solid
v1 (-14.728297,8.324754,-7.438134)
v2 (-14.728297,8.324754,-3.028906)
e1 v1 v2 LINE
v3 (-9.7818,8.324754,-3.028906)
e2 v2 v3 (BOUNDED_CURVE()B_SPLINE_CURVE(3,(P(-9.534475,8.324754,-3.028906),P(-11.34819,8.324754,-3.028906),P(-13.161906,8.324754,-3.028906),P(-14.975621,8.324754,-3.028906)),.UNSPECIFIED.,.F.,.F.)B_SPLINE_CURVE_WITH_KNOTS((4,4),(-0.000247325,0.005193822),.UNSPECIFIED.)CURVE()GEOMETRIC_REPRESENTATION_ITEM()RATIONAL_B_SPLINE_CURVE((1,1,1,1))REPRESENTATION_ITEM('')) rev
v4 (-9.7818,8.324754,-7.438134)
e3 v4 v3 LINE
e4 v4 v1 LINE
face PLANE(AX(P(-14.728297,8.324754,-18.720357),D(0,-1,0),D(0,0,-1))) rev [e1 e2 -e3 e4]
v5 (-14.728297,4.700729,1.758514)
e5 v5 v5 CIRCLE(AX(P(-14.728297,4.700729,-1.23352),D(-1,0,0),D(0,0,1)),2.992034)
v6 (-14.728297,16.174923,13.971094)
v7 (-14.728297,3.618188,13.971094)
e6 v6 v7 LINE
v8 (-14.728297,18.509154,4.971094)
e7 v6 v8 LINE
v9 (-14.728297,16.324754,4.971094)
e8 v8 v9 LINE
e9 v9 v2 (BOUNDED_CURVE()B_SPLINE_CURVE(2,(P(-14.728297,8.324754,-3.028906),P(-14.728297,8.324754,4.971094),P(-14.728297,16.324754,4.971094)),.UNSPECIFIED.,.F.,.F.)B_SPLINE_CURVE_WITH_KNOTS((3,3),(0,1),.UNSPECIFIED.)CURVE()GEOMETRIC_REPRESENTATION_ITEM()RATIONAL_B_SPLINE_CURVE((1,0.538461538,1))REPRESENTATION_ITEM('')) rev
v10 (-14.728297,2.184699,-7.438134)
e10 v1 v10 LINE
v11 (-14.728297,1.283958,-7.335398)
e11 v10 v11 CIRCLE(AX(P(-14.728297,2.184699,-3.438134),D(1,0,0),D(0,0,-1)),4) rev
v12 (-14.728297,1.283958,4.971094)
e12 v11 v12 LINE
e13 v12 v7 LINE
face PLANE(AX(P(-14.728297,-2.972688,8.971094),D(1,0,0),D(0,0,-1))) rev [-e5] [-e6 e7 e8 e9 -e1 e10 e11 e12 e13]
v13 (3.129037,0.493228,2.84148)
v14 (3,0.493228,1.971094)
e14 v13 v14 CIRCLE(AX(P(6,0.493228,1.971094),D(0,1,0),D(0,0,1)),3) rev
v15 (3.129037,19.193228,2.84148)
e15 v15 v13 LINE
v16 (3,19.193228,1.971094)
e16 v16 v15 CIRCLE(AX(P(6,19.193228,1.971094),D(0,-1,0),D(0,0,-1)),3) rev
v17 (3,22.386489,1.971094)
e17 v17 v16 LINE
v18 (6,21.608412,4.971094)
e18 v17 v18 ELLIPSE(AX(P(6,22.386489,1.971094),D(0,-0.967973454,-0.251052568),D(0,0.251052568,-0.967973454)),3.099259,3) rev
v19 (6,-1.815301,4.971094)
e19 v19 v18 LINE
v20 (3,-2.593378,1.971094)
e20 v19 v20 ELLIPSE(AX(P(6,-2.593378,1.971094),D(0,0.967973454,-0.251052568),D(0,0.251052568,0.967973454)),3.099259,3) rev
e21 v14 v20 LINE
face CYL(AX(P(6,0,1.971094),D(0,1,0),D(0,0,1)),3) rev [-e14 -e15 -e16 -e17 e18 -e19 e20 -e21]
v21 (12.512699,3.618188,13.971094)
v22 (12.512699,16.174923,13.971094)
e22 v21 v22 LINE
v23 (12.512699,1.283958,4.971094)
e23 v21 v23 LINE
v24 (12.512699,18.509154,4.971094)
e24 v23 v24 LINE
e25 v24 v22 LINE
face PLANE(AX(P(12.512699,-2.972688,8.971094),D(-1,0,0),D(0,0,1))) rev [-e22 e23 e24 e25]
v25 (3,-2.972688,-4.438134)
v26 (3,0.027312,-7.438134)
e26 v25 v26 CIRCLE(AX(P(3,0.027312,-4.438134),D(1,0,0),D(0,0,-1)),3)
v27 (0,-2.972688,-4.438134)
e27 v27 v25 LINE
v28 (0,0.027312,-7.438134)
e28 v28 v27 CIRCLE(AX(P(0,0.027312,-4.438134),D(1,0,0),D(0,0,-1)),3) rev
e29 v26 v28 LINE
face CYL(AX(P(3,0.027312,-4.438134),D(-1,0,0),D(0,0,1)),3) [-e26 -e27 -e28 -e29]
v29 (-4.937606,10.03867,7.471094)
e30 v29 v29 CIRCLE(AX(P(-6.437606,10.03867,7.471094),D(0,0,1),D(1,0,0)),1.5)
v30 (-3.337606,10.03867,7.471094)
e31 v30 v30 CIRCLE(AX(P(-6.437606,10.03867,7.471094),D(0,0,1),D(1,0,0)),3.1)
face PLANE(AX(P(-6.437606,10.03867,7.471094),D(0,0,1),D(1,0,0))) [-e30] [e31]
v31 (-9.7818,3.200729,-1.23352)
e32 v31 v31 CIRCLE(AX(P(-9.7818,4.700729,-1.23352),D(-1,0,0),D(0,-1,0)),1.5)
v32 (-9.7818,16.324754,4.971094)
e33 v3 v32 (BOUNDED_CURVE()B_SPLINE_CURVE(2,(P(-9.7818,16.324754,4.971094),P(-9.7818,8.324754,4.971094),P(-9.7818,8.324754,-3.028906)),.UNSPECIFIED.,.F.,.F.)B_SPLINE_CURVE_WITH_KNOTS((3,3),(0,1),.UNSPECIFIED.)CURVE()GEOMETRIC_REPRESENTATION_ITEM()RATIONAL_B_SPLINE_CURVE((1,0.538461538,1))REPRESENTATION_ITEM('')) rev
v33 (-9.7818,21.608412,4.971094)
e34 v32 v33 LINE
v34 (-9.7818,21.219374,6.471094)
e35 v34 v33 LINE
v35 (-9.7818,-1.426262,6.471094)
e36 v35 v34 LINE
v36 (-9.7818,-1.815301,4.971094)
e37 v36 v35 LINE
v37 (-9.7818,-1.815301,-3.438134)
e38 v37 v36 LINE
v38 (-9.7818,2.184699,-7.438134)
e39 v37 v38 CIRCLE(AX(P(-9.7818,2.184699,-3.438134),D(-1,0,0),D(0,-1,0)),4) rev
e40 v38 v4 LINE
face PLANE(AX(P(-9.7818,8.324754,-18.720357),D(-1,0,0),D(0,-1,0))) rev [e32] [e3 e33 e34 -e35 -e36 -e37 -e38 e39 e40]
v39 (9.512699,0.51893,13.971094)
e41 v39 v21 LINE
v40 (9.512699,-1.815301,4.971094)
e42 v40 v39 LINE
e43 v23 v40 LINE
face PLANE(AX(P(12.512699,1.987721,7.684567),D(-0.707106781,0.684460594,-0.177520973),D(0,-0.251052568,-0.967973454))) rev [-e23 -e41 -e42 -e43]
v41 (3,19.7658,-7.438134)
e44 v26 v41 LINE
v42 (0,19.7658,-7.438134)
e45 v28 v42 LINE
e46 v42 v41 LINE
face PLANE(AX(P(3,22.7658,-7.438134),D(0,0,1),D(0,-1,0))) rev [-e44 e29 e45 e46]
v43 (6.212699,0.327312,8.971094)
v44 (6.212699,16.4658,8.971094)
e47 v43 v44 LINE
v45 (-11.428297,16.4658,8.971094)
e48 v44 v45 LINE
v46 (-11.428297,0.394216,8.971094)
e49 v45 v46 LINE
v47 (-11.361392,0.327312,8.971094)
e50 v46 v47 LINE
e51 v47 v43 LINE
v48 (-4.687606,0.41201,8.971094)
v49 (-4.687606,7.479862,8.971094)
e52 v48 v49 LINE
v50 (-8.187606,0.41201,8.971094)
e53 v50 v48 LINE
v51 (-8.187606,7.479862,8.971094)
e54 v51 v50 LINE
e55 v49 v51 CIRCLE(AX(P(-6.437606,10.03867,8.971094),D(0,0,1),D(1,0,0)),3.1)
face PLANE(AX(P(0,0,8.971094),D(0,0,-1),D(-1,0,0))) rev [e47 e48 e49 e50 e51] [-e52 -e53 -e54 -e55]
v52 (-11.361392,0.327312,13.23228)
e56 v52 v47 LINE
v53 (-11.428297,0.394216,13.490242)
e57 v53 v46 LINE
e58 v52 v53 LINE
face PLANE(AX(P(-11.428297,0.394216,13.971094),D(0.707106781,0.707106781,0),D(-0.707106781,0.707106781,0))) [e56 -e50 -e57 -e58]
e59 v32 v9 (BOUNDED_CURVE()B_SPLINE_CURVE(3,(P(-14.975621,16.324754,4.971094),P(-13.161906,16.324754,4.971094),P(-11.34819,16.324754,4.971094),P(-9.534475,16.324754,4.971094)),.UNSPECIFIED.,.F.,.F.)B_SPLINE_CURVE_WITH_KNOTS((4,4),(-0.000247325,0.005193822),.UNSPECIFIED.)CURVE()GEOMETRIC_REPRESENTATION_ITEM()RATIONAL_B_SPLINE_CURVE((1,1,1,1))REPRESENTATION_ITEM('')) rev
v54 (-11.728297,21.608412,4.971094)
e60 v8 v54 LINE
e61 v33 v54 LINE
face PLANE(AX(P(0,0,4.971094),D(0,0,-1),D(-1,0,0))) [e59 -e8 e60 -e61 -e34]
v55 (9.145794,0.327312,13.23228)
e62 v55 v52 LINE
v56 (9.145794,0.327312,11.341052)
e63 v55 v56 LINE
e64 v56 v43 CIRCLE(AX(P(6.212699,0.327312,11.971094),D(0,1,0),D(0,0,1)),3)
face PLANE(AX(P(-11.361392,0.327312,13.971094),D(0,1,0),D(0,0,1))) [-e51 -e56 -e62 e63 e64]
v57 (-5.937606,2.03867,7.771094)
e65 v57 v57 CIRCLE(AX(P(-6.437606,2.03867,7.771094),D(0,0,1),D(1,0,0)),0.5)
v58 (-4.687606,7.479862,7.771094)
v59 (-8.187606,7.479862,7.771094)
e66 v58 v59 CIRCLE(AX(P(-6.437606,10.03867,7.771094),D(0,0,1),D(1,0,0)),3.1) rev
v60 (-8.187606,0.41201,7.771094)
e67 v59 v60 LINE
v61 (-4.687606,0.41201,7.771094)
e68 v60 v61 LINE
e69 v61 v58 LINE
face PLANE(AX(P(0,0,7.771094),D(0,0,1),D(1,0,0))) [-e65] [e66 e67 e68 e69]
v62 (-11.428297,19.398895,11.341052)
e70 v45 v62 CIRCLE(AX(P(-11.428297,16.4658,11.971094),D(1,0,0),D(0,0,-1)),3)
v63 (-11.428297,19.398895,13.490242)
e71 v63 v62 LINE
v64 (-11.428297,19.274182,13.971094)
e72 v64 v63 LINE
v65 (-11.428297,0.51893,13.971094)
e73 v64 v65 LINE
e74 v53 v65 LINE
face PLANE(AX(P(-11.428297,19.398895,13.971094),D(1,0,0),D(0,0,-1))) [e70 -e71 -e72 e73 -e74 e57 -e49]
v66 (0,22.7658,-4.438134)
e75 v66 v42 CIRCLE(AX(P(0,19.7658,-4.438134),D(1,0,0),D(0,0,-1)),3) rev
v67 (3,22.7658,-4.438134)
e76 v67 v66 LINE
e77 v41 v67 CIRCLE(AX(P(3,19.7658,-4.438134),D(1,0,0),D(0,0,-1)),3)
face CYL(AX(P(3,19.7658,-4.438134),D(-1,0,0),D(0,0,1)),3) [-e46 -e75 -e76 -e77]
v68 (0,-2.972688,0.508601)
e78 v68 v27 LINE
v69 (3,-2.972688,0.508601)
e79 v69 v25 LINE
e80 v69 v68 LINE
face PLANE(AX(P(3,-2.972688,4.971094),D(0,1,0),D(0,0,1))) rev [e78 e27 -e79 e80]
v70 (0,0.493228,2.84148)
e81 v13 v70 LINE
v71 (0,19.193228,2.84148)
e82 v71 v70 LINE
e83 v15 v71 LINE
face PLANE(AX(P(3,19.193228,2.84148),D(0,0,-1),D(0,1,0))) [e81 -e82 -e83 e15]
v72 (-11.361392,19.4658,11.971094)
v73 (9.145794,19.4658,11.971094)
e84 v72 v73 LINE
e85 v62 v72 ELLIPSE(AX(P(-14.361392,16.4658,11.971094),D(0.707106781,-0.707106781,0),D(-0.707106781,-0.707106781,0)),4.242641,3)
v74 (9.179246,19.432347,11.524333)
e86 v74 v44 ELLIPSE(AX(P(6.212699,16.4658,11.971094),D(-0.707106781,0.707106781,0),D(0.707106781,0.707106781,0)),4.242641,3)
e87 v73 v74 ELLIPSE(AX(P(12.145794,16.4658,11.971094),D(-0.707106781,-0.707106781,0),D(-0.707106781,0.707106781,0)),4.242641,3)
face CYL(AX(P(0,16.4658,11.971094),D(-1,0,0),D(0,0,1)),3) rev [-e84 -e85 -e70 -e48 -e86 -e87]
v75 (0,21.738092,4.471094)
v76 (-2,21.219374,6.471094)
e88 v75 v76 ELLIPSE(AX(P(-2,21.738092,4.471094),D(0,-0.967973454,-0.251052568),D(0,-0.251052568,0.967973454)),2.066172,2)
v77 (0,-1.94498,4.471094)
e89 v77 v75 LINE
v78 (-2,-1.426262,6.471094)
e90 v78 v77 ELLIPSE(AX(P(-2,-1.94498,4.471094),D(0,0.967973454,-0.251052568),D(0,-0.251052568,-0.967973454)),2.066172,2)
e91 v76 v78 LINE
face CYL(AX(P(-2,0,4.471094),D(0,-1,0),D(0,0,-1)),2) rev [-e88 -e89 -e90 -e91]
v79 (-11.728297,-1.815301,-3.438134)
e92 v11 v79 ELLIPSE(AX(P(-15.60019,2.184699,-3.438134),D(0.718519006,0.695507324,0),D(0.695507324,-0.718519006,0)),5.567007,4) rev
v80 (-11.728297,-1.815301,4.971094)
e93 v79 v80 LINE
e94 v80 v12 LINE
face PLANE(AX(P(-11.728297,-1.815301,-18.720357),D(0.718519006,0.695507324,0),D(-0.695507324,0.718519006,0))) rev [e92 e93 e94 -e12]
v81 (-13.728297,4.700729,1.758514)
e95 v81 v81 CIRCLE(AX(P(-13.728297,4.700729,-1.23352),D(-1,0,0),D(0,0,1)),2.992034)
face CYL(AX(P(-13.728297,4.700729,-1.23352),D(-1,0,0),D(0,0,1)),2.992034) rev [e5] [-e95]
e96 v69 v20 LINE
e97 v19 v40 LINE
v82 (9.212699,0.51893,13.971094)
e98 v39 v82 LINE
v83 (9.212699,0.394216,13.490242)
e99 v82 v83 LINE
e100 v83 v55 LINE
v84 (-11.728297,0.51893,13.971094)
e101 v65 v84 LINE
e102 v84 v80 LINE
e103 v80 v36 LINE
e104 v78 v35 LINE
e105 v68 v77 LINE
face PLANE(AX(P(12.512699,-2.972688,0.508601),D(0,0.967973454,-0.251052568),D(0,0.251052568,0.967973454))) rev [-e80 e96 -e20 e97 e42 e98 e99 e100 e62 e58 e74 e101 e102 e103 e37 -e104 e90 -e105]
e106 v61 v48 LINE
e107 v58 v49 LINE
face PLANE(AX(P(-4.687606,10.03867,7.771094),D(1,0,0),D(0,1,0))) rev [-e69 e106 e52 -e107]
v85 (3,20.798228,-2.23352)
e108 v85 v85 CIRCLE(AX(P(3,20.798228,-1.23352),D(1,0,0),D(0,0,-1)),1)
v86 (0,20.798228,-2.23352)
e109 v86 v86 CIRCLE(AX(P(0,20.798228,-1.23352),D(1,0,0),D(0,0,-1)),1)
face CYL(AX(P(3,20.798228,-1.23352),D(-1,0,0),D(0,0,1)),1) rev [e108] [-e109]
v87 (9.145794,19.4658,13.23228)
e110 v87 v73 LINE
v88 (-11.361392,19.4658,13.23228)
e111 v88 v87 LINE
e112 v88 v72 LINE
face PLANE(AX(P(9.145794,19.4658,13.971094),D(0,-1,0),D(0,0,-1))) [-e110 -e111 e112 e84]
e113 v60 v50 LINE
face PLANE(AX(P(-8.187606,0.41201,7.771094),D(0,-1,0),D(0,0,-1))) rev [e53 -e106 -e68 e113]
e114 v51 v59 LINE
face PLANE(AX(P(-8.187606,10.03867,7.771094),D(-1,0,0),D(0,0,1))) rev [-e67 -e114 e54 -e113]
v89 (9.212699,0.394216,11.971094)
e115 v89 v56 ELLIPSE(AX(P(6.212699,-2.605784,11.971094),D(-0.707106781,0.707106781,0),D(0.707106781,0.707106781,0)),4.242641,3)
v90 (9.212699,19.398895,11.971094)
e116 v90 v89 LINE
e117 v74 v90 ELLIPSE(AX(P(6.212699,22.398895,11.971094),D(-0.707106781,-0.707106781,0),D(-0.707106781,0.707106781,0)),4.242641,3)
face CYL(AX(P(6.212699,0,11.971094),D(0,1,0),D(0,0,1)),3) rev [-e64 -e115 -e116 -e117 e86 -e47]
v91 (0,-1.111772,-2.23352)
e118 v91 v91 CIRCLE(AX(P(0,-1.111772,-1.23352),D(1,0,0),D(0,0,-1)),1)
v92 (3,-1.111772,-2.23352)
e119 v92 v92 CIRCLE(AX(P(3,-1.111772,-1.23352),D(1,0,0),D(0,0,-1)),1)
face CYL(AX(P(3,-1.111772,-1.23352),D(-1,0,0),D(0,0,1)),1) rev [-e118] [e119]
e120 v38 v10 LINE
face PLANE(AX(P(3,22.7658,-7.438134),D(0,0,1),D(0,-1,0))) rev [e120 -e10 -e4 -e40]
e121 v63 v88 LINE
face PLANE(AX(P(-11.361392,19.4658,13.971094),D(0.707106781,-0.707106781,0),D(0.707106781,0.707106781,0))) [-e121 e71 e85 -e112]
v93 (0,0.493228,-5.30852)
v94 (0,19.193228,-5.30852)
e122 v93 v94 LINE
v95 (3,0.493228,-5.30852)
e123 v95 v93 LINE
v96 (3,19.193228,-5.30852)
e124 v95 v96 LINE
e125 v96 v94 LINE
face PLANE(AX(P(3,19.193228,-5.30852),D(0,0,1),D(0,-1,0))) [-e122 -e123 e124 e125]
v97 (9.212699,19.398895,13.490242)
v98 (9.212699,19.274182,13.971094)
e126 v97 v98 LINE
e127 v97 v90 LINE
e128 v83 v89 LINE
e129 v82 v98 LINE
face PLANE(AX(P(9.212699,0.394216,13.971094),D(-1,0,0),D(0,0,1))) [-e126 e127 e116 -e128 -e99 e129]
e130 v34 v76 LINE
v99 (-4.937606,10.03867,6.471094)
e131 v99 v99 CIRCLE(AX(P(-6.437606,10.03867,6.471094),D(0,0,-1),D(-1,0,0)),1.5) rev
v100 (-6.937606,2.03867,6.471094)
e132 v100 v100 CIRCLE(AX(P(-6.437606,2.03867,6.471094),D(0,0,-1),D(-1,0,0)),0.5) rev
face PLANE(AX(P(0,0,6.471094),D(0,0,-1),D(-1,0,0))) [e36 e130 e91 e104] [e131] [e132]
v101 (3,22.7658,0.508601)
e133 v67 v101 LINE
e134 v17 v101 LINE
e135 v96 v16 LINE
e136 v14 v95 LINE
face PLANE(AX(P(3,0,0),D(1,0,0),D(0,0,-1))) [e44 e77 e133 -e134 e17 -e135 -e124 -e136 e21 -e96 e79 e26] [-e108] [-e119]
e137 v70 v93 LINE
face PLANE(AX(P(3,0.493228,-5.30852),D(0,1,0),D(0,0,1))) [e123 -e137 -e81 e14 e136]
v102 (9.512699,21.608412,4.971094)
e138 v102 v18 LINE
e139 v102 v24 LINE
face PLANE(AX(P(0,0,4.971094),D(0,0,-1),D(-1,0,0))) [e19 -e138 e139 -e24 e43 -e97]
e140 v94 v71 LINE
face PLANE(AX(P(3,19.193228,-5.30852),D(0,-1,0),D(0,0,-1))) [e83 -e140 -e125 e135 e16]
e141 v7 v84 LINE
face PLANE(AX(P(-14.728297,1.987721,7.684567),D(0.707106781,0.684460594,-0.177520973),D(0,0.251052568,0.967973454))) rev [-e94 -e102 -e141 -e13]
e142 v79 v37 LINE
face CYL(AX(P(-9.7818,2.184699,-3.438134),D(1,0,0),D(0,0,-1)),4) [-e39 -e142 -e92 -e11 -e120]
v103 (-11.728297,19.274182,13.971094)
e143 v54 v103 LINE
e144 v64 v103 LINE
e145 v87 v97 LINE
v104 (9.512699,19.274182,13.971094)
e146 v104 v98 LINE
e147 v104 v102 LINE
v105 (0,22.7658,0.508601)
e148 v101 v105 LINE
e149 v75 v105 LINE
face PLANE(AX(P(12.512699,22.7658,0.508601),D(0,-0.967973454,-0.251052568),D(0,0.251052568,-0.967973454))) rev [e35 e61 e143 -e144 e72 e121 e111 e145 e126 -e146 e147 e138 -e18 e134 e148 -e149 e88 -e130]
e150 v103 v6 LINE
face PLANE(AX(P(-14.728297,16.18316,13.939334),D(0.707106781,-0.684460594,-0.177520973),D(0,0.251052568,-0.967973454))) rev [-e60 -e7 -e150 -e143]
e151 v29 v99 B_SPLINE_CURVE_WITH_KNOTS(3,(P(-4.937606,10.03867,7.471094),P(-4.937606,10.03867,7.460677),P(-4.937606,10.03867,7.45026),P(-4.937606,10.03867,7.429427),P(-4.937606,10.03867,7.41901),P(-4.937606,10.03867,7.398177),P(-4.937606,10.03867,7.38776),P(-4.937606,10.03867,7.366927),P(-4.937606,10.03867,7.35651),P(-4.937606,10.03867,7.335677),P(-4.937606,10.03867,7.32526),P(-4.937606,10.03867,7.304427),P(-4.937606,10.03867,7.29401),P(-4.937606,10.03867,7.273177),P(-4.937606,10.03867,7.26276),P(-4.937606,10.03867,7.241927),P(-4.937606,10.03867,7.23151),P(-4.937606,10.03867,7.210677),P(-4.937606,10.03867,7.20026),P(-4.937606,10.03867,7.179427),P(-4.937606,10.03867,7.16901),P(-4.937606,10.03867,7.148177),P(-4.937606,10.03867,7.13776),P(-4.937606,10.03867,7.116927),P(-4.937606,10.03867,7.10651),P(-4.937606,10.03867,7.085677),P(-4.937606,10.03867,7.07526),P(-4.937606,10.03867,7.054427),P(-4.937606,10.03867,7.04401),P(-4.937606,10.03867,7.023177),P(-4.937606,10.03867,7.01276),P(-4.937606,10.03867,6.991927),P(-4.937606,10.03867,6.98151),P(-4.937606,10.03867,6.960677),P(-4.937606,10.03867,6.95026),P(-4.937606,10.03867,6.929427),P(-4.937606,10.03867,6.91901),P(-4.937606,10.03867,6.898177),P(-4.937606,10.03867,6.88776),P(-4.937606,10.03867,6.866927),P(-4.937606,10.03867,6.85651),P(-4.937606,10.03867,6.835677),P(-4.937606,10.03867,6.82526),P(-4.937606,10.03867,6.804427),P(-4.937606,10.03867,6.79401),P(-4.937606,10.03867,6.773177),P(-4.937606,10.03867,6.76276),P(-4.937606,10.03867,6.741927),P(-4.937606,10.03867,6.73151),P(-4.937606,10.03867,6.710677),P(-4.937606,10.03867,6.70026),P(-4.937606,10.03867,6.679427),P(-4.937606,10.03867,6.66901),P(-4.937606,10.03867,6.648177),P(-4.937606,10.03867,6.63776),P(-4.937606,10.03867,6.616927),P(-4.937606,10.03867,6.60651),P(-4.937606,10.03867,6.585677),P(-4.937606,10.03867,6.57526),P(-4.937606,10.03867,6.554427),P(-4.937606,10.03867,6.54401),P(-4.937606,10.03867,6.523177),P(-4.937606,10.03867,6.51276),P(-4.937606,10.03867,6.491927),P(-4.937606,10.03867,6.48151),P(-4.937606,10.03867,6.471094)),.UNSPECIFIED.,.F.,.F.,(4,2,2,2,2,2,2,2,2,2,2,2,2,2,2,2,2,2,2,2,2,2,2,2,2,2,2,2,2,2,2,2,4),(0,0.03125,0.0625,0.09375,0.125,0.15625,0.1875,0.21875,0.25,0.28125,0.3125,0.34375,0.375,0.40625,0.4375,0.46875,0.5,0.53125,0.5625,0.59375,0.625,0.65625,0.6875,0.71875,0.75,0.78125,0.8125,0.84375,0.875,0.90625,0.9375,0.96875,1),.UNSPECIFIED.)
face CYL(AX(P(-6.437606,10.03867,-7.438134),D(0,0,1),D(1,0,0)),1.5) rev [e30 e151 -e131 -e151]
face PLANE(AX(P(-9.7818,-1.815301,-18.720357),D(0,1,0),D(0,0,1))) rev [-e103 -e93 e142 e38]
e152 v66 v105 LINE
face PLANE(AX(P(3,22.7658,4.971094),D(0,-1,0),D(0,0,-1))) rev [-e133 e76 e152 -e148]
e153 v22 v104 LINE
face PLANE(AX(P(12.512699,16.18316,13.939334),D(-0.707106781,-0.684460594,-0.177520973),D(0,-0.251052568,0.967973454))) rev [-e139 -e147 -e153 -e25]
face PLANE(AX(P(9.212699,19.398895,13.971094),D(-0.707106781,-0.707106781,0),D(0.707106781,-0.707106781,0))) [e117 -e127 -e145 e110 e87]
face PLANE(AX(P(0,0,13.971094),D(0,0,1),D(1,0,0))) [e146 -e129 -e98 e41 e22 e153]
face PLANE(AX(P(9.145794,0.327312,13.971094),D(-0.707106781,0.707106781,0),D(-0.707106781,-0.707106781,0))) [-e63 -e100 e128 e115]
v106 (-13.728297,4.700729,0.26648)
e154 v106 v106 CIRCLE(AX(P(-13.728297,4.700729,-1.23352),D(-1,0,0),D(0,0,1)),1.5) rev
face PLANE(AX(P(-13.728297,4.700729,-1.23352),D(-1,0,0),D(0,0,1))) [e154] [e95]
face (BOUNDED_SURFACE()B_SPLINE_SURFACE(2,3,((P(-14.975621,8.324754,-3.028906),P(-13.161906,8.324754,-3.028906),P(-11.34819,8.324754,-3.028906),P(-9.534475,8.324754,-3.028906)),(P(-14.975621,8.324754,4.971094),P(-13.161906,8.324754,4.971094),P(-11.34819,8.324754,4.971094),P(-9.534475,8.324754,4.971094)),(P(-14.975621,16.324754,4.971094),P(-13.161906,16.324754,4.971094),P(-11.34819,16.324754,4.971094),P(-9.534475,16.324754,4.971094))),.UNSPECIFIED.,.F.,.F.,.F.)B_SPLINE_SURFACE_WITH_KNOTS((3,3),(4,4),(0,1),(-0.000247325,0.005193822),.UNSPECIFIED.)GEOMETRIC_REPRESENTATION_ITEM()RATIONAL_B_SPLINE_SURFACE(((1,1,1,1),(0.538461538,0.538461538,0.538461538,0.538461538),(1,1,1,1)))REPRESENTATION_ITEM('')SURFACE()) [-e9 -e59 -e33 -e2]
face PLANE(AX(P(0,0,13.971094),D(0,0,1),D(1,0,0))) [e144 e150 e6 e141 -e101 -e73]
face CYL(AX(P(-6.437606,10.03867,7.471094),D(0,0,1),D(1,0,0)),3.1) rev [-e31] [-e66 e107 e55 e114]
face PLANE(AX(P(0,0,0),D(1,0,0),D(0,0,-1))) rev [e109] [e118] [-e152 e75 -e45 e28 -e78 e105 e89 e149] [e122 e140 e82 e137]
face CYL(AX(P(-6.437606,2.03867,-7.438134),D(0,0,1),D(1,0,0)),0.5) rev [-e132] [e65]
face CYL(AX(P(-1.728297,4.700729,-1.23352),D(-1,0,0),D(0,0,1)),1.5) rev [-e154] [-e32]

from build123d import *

# Parameters (mm, degrees)
SKETCH1_W                = 12.409227922
SKETCH1_H                = 25.738488059
SKETCH1_R                = 1
SKETCH1_W_2              = 8.15
SKETCH1_H_2              = 18.7
BOSS_EXTRUDE1_DEPTH      = 3
SKETCH15_W               = 27.240995133
SKETCH15_H               = 25.738488059
BOSS_EXTRUDE5_DEPTH      = 4
SKETCH16_R               = 3.1
CUT_EXTRUDE12_DEPTH      = 1.5
CUT_EXTRUDE13_DEPTH      = 1.2
CHAMFER1_SIZE            = 2
CUT_EXTRUDE14_DEPTH      = 31.943326143
CUT_EXTRUDE14_DEPTH_BACK = 31.943326143
SKETCH18_R               = 1.5
SKETCH18_R_2             = 0.5
FILLET1_R                = 3
FILLET2_R                = 3
BOSS_EXTRUDE7_DEPTH      = 5
CUT_EXTRUDE15_DEPTH      = 39.151604311
CUT_EXTRUDE15_DEPTH_BACK = 39.151604311
CHAMFER2_SIZE            = 3
SKETCH23_R               = 3.318889956
SKETCH23_R_2             = 1.409018686
CUT_EXTRUDE17_DEPTH      = 1
FILLET4_R                = 3
BOSS_EXTRUDE8_DEPTH      = 12.409227923
SKETCH25_R               = 1.5
CUT_EXTRUDE18_DEPTH      = 13
SKETCH26_R               = 2.992034133
CUT_EXTRUDE19_DEPTH      = 1
FILLET5_SIZE             = 8
FILLET6_R                = 4
SKETCH27_W               = 9.781799862
SKETCH27_H               = 23.423713079
CUT_EXTRUDE20_DEPTH      = 1.5
FILLET7_R                = 2


with BuildPart() as part:
    # Sketch1 → Boss-Extrude1 (new body)
    with BuildSketch(Plane(origin=(0, 0, 0), x_dir=(0, 0, -1), z_dir=(1, 0, 0))):
        with Locations((1.233520205, 9.896555647)):
            Rectangle(SKETCH1_W, SKETCH1_H)
        with Locations((1.233520205, 20.798227972)):
            Circle(SKETCH1_R, mode=Mode.SUBTRACT)
        with Locations((1.233520205, -1.111772028)):
            Circle(SKETCH1_R, mode=Mode.SUBTRACT)
        with Locations((1.233520205, 9.843227972)):
            Rectangle(SKETCH1_W_2, SKETCH1_H_2, mode=Mode.SUBTRACT)
    extrude(amount=BOSS_EXTRUDE1_DEPTH)

    # Sketch15 → Boss-Extrude5 (add)
    with BuildSketch(Plane.XY.offset(4.971093756)):
        with Locations((-1.10779903, 9.896555647)):
            Rectangle(SKETCH15_W, SKETCH15_H)
    extrude(amount=BOSS_EXTRUDE5_DEPTH)

    # Sketch16 → Cut-Extrude12 (cut)
    with BuildSketch(Plane.XY.offset(8.971093756)):
        with Locations((-6.437606402, 10.038669905)):
            Circle(SKETCH16_R)
    extrude(amount=-CUT_EXTRUDE12_DEPTH, mode=Mode.SUBTRACT)

    # Sketch17 → Cut-Extrude13 (cut)
    with BuildSketch(Plane.XY.offset(8.971093756)):
        Polygon((-6.437606402, 10.038669905), (-8.187606402, 10.038669905), (-8.187606402, 0.412009525), (-4.687606402, 0.412009525), (-4.687606402, 10.038669905), align=None)
    extrude(amount=-CUT_EXTRUDE13_DEPTH, mode=Mode.SUBTRACT)

    # Chamfer1
    chamfer1_edges = [part.edges().sort_by_distance(p)[0] for p in [
        (-14.728296596, 22.765799677, 6.971093756),
        (-14.728296596, -2.972688382, 6.971093756),
        (12.512698537, -2.972688382, 6.971093756),
        (12.512698537, 22.765799677, 6.971093756),
    ]]
    chamfer(chamfer1_edges, length=CHAMFER1_SIZE)

    # Sketch18 → Cut-Extrude14 (cut, two sides: drawn at the far end of the back side and taken through both)
    with BuildSketch(Plane.XY.offset(7.471093756).offset(-CUT_EXTRUDE14_DEPTH_BACK)):
        with Locations((-6.437606402, 10.038669905)):
            Circle(SKETCH18_R)
        with Locations((-6.437606402, 2.038669905)):
            Circle(SKETCH18_R_2)
    extrude(amount=CUT_EXTRUDE14_DEPTH + CUT_EXTRUDE14_DEPTH_BACK, mode=Mode.SUBTRACT)

    # Fillet1
    fillet1_edges = [part.edges().sort_by_distance(p)[0] for p in [
        (1.5, -2.972688382, -7.438134166),
        (1.5, 22.765799677, -7.438134166),
    ]]
    fillet(fillet1_edges, radius=FILLET1_R)

    # Fillet2
    # the kernel refuses this fillet: 3 mm, written as the material it adds along each edge
    with BuildSketch(Plane(origin=(3, -2.972688382, 4.971093756), x_dir=(0, 0, -1), z_dir=(0, 1, 0))) as fillet2_piece_1_section:
        with BuildLine():
            CenterArc((FILLET2_R, -FILLET2_R), FILLET2_R, 90, 90)
            Line((0, -FILLET2_R), (0, 0))
            Line((0, 0), (FILLET2_R, 0))
        make_face()
    fillet2_piece_1 = extrude(amount=25.738488059, mode=Mode.PRIVATE)
    fillet2_piece_1 = split(fillet2_piece_1, bisect_by=Plane(origin=(3, -2.972688382, 2.841479795), z_dir=(0, 0, -1)), keep=Keep.TOP, mode=Mode.PRIVATE)
    fillet2_piece_1 = split(fillet2_piece_1, bisect_by=Plane(origin=(3, 0.493227972, 4.971093756), z_dir=(0, -1, 0)), keep=Keep.TOP, mode=Mode.PRIVATE)
    add(fillet2_piece_1)
    with BuildSketch(Plane(origin=(3, -2.972688382, 4.971093756), x_dir=(0, 0, -1), z_dir=(0, 1, 0))) as fillet2_piece_2_section:
        with BuildLine():
            CenterArc((FILLET2_R, -FILLET2_R), FILLET2_R, 90, 90)
            Line((0, -FILLET2_R), (0, 0))
            Line((0, 0), (FILLET2_R, 0))
        make_face()
    fillet2_piece_2 = extrude(amount=25.738488059, mode=Mode.PRIVATE)
    fillet2_piece_2 = split(fillet2_piece_2, bisect_by=Plane(origin=(3, -2.972688382, 2.841479795), z_dir=(0, 0, 1)), keep=Keep.TOP, mode=Mode.PRIVATE)
    fillet2_piece_2 = split(fillet2_piece_2, bisect_by=Plane(origin=(3, 0.493227972, 4.971093756), z_dir=(0, -1, 0)), keep=Keep.TOP, mode=Mode.PRIVATE)
    add(fillet2_piece_2)
    with BuildSketch(Plane(origin=(3, -2.972688382, 4.971093756), x_dir=(0, 0, -1), z_dir=(0, 1, 0))) as fillet2_piece_3_section:
        with BuildLine():
            CenterArc((FILLET2_R, -FILLET2_R), FILLET2_R, 90, 90)
            Line((0, -FILLET2_R), (0, 0))
            Line((0, 0), (FILLET2_R, 0))
        make_face()
    fillet2_piece_3 = extrude(amount=25.738488059, mode=Mode.PRIVATE)
    fillet2_piece_3 = split(fillet2_piece_3, bisect_by=Plane(origin=(3, 19.193227972, 4.971093756), z_dir=(0, -1, 0)), keep=Keep.TOP, mode=Mode.PRIVATE)
    fillet2_piece_3 = split(fillet2_piece_3, bisect_by=Plane(origin=(3, -2.972688382, 2.841479795), z_dir=(0, 0, 1)), keep=Keep.TOP, mode=Mode.PRIVATE)
    fillet2_piece_3 = split(fillet2_piece_3, bisect_by=Plane(origin=(3, 0.493227972, 4.971093756), z_dir=(0, 1, 0)), keep=Keep.TOP, mode=Mode.PRIVATE)
    add(fillet2_piece_3)
    with BuildSketch(Plane(origin=(3, -2.972688382, 4.971093756), x_dir=(0, 0, -1), z_dir=(0, 1, 0))) as fillet2_piece_4_section:
        with BuildLine():
            CenterArc((FILLET2_R, -FILLET2_R), FILLET2_R, 90, 90)
            Line((0, -FILLET2_R), (0, 0))
            Line((0, 0), (FILLET2_R, 0))
        make_face()
    fillet2_piece_4 = extrude(amount=25.738488059, mode=Mode.PRIVATE)
    fillet2_piece_4 = split(fillet2_piece_4, bisect_by=Plane(origin=(3, 19.193227972, 4.971093756), z_dir=(0, 1, 0)), keep=Keep.TOP, mode=Mode.PRIVATE)
    fillet2_piece_4 = split(fillet2_piece_4, bisect_by=Plane(origin=(3, -2.972688382, 2.841479795), z_dir=(0, 0, -1)), keep=Keep.TOP, mode=Mode.PRIVATE)
    add(fillet2_piece_4)
    with BuildSketch(Plane(origin=(3, -2.972688382, 4.971093756), x_dir=(0, 0, -1), z_dir=(0, 1, 0))) as fillet2_piece_5_section:
        with BuildLine():
            CenterArc((FILLET2_R, -FILLET2_R), FILLET2_R, 90, 90)
            Line((0, -FILLET2_R), (0, 0))
            Line((0, 0), (FILLET2_R, 0))
        make_face()
    fillet2_piece_5 = extrude(amount=25.738488059, mode=Mode.PRIVATE)
    fillet2_piece_5 = split(fillet2_piece_5, bisect_by=Plane(origin=(3, 19.193227972, 4.971093756), z_dir=(0, 1, 0)), keep=Keep.TOP, mode=Mode.PRIVATE)
    fillet2_piece_5 = split(fillet2_piece_5, bisect_by=Plane(origin=(3, -2.972688382, 2.841479795), z_dir=(0, 0, 1)), keep=Keep.TOP, mode=Mode.PRIVATE)
    add(fillet2_piece_5)

    # Sketch20 → Boss-Extrude7 (add)
    with BuildSketch(Plane.XY.offset(8.971093756)):
        Polygon((-12.728296596, 22.765799677), (-14.728296596, 20.765799677), (-14.728296596, -0.972688382), (-12.728296596, -2.972688382), (10.512698537, -2.972688382), (12.512698537, -0.972688382), (12.512698537, 20.765799677), (10.512698537, 22.765799677), align=None)
        Polygon((9.145793781, 0.327311618), (9.212698537, 0.394216374), (9.212698537, 19.398894921), (9.145793781, 19.465799677), (-11.36139184, 19.465799677), (-11.428296596, 19.398894921), (-11.428296596, 0.394216374), (-11.36139184, 0.327311618), align=None, mode=Mode.SUBTRACT)
    extrude(amount=BOSS_EXTRUDE7_DEPTH)

    # Sketch21 → Cut-Extrude15 (cut, two sides: drawn at the far end of the back side and taken through both)
    with BuildSketch(Plane.ZY.offset(14.728296596).offset(-CUT_EXTRUDE15_DEPTH_BACK)):
        Polygon((0.508600598, 22.765799677), (13.971093756, 19.274181739), (13.971093756, 24.16200456), (0.508600598, 24.16200456), align=None)
        Polygon((0.508600598, -4.368893265), (0.508600598, -2.972688382), (13.971093756, 0.518929556), (13.971093756, -4.368893265), align=None)
    extrude(amount=CUT_EXTRUDE15_DEPTH + CUT_EXTRUDE15_DEPTH_BACK, mode=Mode.SUBTRACT)

    # Chamfer2
    chamfer2_edges = [part.edges().sort_by_distance(p)[0] for p in [
        (-14.728296596, -0.226879413, 11.095507618),
        (12.512698537, 20.019990708, 11.095507618),
        (12.512698537, -0.226879413, 11.095507618),
        (-14.728296596, 20.019990708, 11.095507618),
    ]]
    chamfer(chamfer2_edges, length=CHAMFER2_SIZE)

    # Sketch23 → Cut-Extrude17 (cut)
    with BuildSketch(Plane(origin=(0, 0, 4.971093756), x_dir=(-1, 0, 0), z_dir=(0, 0, -1))):
        with Locations((6.437606402, 10.038669905)):
            Circle(SKETCH23_R)
        with Locations((6.437606402, 2.038669905)):
            Circle(SKETCH23_R_2)
    extrude(amount=-CUT_EXTRUDE17_DEPTH, mode=Mode.SUBTRACT)

    # Fillet4
    # the kernel refuses this fillet: 3 mm, written as the material it adds along each edge
    with BuildSketch(Plane(origin=(9.212698537, -7.105783626, 8.971093756), x_dir=(0, 0, 1), z_dir=(0, 1, 0))) as fillet4_piece_1_section:
        with BuildLine():
            CenterArc((FILLET4_R, -FILLET4_R), FILLET4_R, 90, 90)
            Line((0, -FILLET4_R), (0, 0))
            Line((0, 0), (FILLET4_R, 0))
        make_face()
    fillet4_piece_1 = extrude(amount=34.004678547, mode=Mode.PRIVATE)
    fillet4_piece_1 = split(fillet4_piece_1, bisect_by=Plane(origin=(9.212698537, 19.465799677, 8.971093756), z_dir=(0, -1, 0)), keep=Keep.TOP, mode=Mode.PRIVATE)
    fillet4_piece_1 = split(fillet4_piece_1, bisect_by=Plane(origin=(9.212698537, 0.327311618, 8.971093756), z_dir=(0, 1, 0)), keep=Keep.TOP, mode=Mode.PRIVATE)
    add(fillet4_piece_1)
    with BuildSketch(Plane(origin=(16.645793781, 19.465799677, 8.971093756), x_dir=(0, 0, 1), z_dir=(-1, 0, 0))) as fillet4_piece_2_section:
        with BuildLine():
            CenterArc((FILLET4_R, -FILLET4_R), FILLET4_R, 90, 90)
            Line((0, -FILLET4_R), (0, 0))
            Line((0, 0), (FILLET4_R, 0))
        make_face()
    fillet4_piece_2 = extrude(amount=35.50718562, mode=Mode.PRIVATE)
    fillet4_piece_2 = split(fillet4_piece_2, bisect_by=Plane(origin=(12.895793781, 15.715799677, 8.971093756), z_dir=(-0.707106781186557, -0.7071067811865381, 0)), keep=Keep.TOP, mode=Mode.PRIVATE)
    fillet4_piece_2 = split(fillet4_piece_2, bisect_by=Plane(origin=(-11.428296596, 19.465799677, 8.971093756), z_dir=(1, 0, 0)), keep=Keep.TOP, mode=Mode.PRIVATE)
    add(fillet4_piece_2)

    # Sketch24 → Boss-Extrude8 (add)
    with BuildSketch(Plane(origin=(0, 0, 4.971093756), x_dir=(-1, 0, 0), z_dir=(0, 0, -1))):
        Polygon((14.728296596, 8.32475399), (9.781799862, 8.32475399), (9.781799862, -1.815300892), (11.728296596, -1.815300892), (14.728296596, 1.283957653), align=None)
    extrude(amount=BOSS_EXTRUDE8_DEPTH)

    # Sketch25 → Cut-Extrude18 (cut)
    with BuildSketch(Plane.ZY.offset(14.728296596)):
        with Locations((-1.233520205, 4.70072857)):
            Circle(SKETCH25_R)
    extrude(amount=-CUT_EXTRUDE18_DEPTH, mode=Mode.SUBTRACT)

    # Sketch26 → Cut-Extrude19 (cut)
    with BuildSketch(Plane.ZY.offset(14.728296596)):
        with Locations((-1.233520205, 4.70072857)):
            Circle(SKETCH26_R)
    extrude(amount=-CUT_EXTRUDE19_DEPTH, mode=Mode.SUBTRACT)

    # Fillet5
    # a fillet whose section is not a circle: 8 mm, written as the material it adds along each edge
    with BuildSketch(Plane(origin=(-14.728296596, 8.32475399, 4.971093756), x_dir=(0, 1, 0), z_dir=(1, 0, 0))) as fillet5_piece_1:
        with BuildLine():
            Bezier((FILLET5_SIZE, 0), (0, 0), (0, -FILLET5_SIZE), weights=[1, 0.538461538, 1])
            Line((0, -FILLET5_SIZE), (0, 0))
            Line((0, 0), (FILLET5_SIZE, 0))
        make_face()
    extrude(amount=4.946496733)

    # Fillet6
    fillet6_edges = [part.edges().sort_by_distance(p)[0] for p in [
        (-10.755048229, -1.815300892, -7.438134167),
    ]]
    fillet(fillet6_edges, radius=FILLET6_R)

    # Sketch27 → Cut-Extrude20 (cut)
    with BuildSketch(Plane(origin=(0, 0, 4.971093756), x_dir=(-1, 0, 0), z_dir=(0, 0, -1))):
        with Locations((4.890899931, 9.896555648)):
            Rectangle(SKETCH27_W, SKETCH27_H)
    extrude(amount=-CUT_EXTRUDE20_DEPTH, mode=Mode.SUBTRACT)

    # Fillet7
    fillet7_edges = [part.edges().sort_by_distance(p)[0] for p in [
        (0, 9.896555648, 6.471093756),
    ]]
    fillet(fillet7_edges, radius=FILLET7_R)


solid = part.part
